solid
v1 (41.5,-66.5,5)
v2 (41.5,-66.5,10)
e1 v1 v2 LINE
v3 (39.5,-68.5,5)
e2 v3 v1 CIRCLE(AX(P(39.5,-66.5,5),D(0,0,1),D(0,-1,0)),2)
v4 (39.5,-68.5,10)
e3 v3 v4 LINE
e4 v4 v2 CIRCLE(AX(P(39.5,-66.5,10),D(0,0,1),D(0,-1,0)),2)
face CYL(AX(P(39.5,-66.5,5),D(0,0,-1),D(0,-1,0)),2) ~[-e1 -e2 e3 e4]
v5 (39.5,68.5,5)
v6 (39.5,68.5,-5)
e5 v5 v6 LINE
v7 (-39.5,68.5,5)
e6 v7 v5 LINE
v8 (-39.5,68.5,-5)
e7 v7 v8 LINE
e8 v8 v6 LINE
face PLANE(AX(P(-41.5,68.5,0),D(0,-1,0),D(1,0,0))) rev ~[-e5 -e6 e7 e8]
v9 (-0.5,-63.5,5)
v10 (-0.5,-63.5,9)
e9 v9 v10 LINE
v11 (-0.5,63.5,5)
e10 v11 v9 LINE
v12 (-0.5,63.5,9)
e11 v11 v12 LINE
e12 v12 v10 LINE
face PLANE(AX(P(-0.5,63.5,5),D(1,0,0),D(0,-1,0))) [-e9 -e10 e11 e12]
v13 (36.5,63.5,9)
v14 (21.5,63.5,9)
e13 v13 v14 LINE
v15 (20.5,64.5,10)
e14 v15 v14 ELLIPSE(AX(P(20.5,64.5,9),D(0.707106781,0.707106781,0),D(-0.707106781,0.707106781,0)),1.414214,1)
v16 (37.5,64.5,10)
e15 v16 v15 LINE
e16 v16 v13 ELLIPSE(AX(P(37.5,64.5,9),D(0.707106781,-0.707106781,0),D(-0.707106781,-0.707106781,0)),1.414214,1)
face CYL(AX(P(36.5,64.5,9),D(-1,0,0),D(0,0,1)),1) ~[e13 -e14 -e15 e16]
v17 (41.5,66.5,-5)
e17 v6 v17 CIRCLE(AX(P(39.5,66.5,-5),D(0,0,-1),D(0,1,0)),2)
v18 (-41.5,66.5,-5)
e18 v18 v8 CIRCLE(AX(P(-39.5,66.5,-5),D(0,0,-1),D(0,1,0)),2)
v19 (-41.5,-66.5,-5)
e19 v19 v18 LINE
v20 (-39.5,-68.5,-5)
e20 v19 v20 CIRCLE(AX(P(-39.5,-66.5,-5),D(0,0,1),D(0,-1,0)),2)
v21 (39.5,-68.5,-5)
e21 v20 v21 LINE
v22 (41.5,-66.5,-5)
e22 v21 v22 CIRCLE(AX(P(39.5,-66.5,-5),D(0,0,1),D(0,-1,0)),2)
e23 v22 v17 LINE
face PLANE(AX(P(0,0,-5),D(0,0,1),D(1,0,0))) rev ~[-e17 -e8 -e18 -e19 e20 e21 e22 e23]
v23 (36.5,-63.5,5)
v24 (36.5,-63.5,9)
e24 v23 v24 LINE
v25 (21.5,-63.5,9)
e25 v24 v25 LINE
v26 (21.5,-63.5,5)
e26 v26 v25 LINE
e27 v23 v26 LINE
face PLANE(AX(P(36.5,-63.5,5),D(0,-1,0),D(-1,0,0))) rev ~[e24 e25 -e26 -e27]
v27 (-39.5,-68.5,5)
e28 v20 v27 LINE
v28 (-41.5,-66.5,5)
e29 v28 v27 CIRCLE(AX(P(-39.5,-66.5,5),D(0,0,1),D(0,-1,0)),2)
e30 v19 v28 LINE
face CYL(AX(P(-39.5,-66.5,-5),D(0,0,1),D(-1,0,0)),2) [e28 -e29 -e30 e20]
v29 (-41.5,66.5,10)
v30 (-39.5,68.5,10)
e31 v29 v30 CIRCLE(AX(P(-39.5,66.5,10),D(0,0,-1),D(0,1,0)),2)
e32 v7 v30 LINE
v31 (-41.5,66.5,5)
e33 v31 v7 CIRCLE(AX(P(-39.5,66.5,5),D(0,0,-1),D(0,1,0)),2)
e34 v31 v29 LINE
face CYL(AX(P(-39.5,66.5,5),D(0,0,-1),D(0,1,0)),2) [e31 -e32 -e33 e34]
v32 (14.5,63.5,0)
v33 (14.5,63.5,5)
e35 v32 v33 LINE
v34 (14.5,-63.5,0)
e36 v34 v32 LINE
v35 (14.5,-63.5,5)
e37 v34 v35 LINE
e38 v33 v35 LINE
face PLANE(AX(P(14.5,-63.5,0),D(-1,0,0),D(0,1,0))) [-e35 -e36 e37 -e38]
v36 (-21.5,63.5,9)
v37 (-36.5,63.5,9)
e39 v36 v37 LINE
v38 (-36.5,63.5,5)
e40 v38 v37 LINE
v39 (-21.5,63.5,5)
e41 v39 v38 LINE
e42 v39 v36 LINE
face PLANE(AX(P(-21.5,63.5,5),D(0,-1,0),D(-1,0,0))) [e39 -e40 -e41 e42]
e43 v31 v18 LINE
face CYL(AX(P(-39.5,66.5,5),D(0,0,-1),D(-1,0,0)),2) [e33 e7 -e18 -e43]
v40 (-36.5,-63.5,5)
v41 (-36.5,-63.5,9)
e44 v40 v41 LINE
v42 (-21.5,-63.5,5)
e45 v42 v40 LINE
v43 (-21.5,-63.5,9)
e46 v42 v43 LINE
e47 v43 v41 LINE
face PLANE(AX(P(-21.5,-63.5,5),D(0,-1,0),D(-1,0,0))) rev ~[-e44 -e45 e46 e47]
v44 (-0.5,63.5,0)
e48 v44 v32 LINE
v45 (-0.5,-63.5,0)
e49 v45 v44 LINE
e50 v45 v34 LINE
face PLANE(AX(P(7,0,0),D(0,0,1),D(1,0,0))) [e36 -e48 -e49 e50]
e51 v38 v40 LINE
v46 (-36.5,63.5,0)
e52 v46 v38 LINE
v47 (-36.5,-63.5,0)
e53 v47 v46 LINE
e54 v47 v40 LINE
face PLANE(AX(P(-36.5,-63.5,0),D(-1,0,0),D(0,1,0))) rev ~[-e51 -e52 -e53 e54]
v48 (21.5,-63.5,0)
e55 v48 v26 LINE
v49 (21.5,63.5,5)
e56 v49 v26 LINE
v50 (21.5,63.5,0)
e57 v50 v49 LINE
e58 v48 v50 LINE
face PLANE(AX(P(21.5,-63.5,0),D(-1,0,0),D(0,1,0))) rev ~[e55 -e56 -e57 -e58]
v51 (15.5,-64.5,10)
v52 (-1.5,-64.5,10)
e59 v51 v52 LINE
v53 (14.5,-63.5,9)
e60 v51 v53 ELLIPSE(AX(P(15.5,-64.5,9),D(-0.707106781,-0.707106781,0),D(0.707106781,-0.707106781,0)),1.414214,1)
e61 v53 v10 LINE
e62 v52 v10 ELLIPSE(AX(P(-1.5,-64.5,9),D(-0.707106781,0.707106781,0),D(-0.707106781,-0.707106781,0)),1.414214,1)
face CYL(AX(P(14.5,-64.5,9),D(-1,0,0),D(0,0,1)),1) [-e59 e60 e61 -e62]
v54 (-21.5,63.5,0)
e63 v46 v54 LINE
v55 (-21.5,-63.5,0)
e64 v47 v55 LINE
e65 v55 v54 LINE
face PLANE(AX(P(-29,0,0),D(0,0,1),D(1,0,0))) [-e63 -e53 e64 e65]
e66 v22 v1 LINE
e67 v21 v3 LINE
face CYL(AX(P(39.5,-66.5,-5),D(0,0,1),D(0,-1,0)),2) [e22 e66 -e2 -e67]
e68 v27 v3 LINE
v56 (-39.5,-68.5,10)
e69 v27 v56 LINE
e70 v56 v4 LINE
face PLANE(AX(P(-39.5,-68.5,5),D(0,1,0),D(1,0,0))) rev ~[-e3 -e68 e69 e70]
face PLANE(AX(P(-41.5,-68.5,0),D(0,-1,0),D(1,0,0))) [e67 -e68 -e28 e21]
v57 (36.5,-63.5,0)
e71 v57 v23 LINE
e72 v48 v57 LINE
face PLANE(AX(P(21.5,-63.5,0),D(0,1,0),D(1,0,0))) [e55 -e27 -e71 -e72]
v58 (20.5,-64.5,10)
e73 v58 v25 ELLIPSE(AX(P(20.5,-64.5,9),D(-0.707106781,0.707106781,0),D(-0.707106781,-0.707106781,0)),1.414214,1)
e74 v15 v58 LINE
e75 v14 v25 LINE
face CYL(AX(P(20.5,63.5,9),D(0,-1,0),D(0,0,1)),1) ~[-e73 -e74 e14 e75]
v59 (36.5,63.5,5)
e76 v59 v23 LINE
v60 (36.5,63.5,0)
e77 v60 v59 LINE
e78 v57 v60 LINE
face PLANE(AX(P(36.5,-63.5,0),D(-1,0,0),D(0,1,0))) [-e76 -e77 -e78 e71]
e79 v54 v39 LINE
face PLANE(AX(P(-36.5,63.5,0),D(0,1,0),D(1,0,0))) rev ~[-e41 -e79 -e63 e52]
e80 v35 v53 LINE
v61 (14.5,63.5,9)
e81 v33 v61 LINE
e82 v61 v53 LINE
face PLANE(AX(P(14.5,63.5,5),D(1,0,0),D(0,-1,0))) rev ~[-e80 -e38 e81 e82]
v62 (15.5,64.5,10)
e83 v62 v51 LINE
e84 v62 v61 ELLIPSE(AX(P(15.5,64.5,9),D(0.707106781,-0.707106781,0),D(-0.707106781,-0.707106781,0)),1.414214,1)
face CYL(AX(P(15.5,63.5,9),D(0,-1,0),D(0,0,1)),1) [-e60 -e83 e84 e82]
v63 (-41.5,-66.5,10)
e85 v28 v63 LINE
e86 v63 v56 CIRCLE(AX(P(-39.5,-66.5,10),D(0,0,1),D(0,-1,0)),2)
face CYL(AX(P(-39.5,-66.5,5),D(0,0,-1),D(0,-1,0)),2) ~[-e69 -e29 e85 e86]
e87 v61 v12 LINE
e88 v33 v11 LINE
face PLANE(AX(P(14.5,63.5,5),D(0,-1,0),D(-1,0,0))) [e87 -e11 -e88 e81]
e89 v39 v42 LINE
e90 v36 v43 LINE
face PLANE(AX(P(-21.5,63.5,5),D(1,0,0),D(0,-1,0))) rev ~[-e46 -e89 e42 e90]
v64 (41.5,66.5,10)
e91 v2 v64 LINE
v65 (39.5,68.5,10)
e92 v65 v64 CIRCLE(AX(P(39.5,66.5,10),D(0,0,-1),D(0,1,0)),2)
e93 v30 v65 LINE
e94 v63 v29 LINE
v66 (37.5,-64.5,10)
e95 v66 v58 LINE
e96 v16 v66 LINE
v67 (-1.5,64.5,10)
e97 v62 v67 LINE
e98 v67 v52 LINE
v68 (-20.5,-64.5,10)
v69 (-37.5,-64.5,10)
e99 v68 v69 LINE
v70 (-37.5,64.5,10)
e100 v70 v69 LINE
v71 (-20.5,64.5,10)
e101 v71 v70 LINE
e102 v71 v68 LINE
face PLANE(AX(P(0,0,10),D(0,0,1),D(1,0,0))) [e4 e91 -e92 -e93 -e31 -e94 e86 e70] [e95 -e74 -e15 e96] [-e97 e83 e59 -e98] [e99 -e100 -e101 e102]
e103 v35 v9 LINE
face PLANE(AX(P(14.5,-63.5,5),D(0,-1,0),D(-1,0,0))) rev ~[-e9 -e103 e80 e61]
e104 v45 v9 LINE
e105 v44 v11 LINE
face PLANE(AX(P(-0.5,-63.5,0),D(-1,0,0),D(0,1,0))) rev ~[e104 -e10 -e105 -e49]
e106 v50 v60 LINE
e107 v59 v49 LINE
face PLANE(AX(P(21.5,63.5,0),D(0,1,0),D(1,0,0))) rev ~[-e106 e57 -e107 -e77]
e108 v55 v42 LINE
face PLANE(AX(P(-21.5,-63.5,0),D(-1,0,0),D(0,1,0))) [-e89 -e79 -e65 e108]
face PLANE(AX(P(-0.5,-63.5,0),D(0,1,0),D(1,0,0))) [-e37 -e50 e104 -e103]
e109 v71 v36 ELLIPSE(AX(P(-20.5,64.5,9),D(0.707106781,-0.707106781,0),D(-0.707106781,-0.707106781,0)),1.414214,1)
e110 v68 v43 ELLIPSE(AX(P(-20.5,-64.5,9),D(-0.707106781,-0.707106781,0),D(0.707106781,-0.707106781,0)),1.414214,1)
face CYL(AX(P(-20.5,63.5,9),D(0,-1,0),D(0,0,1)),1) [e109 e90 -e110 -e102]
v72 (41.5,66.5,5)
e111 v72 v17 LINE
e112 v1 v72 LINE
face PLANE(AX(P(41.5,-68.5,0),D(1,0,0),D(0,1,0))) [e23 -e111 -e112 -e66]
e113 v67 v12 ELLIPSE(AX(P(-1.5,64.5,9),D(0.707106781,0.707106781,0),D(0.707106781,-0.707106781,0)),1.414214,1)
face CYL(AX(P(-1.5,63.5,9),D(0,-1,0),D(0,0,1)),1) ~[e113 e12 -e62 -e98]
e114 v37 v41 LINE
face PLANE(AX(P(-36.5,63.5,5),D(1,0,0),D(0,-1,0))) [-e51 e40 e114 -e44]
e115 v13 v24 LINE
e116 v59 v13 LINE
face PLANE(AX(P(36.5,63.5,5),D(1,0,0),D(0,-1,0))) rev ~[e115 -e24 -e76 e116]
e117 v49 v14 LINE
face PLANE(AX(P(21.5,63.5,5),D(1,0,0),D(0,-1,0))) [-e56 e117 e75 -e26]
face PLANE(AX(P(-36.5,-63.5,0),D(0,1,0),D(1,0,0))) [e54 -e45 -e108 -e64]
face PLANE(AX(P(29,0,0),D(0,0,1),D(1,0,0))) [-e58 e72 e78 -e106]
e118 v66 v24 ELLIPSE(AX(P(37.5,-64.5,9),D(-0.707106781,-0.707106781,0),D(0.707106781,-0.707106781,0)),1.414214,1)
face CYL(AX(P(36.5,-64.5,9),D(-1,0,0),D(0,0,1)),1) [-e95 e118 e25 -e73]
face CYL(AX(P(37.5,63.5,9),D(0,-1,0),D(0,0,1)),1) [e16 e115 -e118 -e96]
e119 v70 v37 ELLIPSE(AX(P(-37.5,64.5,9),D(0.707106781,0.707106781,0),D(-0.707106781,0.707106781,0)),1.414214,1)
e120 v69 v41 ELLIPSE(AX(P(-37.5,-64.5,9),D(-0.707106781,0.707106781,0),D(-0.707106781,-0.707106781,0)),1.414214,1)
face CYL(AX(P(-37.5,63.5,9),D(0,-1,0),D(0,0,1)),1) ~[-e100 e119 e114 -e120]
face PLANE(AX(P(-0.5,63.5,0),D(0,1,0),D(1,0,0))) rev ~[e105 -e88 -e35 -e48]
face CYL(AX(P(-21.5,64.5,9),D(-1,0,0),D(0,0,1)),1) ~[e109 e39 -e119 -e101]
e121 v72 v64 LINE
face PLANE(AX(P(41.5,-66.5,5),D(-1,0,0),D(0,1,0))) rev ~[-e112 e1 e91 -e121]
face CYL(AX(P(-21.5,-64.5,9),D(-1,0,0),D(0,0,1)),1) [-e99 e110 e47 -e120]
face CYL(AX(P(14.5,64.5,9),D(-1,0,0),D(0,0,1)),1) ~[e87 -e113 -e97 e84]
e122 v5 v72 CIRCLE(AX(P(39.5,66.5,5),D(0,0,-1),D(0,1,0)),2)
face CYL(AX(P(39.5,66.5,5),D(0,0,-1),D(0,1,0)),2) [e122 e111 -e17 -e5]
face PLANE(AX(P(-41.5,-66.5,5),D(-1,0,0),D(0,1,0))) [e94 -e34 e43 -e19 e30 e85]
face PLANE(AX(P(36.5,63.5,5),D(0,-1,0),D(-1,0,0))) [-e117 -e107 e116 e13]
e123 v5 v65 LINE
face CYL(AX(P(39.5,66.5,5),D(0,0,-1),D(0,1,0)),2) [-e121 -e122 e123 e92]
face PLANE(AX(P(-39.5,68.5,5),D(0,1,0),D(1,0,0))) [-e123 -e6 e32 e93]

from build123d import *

# Parameters (mm, degrees)
F1_W     = 83
F1_H     = 137
F2_DEPTH = 5
F0_W     = 15
F0_H     = 127
F3_DEPTH = 25
F4_R     = 2
F5_DEPTH = 5
F6_R     = 1


with BuildPart() as f2:
    # F1 (on Top) → F2 (new body, symmetric)
    with BuildSketch(Plane.XY):
        Rectangle(F1_W, F1_H)
    extrude(amount=F2_DEPTH, both=True)

    # F0 (on Top) → F3 (cut)
    with BuildSketch(Plane.XY):
        with Locations((-29, 0)):
            Rectangle(F0_W, F0_H)
        with Locations((29, 0)):
            Rectangle(F0_W, F0_H)
        with Locations((7, 0)):
            Rectangle(F0_W, F0_H)
    extrude(amount=F3_DEPTH, mode=Mode.SUBTRACT)

    # F4
    f4_edges = [f2.edges().sort_by_distance(p)[0] for p in [
        (-41.5, -68.5, 0),
        (41.5, -68.5, 0),
        (41.5, 68.5, 0),
        (-41.5, 68.5, 0),
    ]]
    fillet(f4_edges, radius=F4_R)

    # F5 (add): a face of the model
    f5_faces = [f2.faces().sort_by_distance(p)[0] for p in [
        (-2.3591054268, 0, 5),
    ]]
    extrude(f5_faces, amount=F5_DEPTH)

    # F6
    f6_edges = [f2.edges().sort_by_distance(p)[0] for p in [
        (-21.5, 0, 10),
        (-29, 63.5, 10),
        (-36.5, 0, 10),
        (-29, -63.5, 10),
        (-0.5, 0, 10),
        (14.5, 0, 10),
        (7, 63.5, 10),
        (7, -63.5, 10),
        (29, 63.5, 10),
        (21.5, 0, 10),
        (36.5, 0, 10),
        (29, -63.5, 10),
    ]]
    fillet(f6_edges, radius=F6_R)


solid = f2.part
